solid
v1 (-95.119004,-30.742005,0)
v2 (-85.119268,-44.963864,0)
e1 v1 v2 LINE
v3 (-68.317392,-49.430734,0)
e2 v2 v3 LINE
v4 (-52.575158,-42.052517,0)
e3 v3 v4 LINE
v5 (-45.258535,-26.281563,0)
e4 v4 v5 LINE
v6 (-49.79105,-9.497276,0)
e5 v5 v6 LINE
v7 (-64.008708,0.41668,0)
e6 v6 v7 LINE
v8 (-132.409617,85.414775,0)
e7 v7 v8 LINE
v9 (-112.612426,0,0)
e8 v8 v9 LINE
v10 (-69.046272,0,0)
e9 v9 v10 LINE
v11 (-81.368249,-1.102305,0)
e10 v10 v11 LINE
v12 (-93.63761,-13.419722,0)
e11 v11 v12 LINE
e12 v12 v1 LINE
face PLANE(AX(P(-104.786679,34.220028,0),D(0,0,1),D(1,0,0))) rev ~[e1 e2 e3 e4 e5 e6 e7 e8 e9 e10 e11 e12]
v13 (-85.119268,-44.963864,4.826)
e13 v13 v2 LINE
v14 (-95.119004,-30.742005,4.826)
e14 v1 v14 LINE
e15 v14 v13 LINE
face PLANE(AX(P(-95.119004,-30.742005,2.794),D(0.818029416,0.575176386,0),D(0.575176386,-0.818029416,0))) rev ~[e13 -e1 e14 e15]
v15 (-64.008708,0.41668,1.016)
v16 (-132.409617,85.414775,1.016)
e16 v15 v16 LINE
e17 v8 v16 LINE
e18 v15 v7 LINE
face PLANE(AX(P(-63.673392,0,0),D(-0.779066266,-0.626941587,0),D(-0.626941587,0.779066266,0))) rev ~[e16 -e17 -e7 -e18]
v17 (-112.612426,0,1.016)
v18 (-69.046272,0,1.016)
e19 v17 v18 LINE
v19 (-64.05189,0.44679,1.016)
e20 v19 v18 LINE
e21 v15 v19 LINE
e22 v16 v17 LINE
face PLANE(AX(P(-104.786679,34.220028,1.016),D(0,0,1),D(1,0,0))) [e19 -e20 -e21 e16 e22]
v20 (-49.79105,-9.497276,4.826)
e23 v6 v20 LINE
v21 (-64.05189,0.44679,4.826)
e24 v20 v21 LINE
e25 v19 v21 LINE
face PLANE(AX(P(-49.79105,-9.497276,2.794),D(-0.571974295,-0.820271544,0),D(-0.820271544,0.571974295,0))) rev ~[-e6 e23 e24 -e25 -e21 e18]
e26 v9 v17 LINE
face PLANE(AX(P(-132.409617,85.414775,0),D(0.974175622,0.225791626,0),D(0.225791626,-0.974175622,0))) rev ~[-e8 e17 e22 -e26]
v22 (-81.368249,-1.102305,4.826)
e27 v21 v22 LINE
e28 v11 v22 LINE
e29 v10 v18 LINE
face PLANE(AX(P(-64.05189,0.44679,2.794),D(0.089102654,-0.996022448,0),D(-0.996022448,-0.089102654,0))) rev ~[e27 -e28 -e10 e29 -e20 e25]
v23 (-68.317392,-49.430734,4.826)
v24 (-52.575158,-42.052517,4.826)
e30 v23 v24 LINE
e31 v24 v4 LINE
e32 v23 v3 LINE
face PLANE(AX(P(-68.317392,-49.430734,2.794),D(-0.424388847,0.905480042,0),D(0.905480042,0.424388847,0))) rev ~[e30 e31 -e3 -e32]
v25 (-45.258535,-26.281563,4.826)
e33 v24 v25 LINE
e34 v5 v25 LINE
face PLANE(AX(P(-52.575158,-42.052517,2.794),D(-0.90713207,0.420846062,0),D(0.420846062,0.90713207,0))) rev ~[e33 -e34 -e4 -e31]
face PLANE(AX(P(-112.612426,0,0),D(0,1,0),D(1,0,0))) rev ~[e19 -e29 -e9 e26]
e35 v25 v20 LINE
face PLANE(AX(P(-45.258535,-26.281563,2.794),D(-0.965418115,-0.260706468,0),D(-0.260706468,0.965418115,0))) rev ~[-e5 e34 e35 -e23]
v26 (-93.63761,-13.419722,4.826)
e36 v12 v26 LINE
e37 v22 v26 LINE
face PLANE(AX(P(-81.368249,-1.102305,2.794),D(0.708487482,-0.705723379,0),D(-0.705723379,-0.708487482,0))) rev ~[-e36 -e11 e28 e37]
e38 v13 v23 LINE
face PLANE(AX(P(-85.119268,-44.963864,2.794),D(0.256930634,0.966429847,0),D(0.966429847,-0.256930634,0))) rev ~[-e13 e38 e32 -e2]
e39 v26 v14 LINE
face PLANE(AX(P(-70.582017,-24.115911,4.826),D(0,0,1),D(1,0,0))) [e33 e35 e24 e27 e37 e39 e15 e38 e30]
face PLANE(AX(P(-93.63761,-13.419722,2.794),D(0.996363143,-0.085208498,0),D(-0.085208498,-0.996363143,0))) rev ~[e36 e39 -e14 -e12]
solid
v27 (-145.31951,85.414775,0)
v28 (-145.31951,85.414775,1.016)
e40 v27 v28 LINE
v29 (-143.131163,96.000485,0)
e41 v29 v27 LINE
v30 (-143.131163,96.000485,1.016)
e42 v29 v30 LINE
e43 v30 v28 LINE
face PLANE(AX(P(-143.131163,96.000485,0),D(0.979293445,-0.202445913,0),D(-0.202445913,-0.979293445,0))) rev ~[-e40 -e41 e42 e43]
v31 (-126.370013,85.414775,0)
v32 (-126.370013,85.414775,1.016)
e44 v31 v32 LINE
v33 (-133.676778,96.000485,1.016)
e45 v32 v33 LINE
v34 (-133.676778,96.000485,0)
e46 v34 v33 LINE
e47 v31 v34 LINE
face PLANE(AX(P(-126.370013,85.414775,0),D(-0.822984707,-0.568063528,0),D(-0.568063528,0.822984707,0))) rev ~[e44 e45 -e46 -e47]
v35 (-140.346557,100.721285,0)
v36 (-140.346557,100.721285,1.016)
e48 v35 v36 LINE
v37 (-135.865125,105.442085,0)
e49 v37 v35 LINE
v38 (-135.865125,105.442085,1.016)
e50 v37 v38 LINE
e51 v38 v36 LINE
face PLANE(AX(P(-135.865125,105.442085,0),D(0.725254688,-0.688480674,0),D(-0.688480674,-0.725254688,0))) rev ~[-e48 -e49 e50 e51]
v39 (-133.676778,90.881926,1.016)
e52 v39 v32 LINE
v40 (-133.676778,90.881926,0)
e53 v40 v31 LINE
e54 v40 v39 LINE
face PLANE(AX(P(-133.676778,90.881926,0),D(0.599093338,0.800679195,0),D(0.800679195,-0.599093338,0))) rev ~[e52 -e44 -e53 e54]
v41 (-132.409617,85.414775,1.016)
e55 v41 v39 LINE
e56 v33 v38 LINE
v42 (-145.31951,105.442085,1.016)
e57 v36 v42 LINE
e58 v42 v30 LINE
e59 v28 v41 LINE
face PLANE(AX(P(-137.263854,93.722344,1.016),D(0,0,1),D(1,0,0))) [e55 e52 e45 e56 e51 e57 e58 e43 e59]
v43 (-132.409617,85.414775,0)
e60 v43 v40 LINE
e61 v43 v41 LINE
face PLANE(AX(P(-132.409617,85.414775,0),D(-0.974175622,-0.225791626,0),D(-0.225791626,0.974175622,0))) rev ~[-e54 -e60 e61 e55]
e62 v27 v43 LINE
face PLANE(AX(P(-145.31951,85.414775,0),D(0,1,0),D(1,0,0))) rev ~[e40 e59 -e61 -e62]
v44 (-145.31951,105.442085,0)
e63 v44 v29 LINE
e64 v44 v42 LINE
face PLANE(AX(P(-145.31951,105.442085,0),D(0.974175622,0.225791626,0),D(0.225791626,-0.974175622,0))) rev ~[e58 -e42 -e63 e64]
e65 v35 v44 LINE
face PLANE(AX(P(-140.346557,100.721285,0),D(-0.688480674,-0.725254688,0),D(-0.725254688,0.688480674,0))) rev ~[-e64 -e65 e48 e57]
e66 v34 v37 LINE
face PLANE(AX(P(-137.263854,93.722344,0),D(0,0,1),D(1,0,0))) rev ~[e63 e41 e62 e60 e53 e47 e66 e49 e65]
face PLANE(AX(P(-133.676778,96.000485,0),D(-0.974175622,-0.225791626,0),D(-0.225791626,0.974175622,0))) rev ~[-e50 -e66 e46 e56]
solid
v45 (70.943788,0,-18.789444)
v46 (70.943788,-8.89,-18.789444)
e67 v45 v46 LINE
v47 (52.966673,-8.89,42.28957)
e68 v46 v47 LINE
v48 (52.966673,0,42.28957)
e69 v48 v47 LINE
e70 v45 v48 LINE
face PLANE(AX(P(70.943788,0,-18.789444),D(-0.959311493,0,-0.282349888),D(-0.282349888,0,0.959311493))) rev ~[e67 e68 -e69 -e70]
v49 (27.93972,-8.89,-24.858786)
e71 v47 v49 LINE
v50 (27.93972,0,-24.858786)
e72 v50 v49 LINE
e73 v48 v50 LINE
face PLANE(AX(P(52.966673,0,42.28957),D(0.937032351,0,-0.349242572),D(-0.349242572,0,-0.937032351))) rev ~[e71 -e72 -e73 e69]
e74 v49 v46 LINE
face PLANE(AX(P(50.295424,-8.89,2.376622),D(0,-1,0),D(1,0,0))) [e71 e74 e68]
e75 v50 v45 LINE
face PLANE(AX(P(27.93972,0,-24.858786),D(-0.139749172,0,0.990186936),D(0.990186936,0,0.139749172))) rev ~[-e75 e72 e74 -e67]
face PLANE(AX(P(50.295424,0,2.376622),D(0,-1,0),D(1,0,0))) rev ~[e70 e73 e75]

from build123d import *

# Parameters (mm, degrees)
F1_DEPTH = 2.794
F3_DEPTH = 2.032
F6_DEPTH = 1.016
F8_DEPTH = 8.89


# Not quite as in the source:
# - the program builds the solid bodies; features that only make, move or delete a surface that nothing else refers to are left out


with BuildPart() as f1:
    # F0 (on Top) → F1 (new body)
    with BuildSketch(Plane.XY):
        Polygon((-52.5751584309, -42.0525174268), (-45.2585345965, -26.281562852), (-49.7910497594, -9.4972755918), (-64.0518897016, 0.4467898081), (-81.3682489225, -1.1023053687), (-93.6376104928, -13.4197222729), (-95.119003775, -30.7420046421), (-85.1192683885, -44.9638640401), (-68.3173916553, -49.4307343961), align=None)
    extrude(amount=F1_DEPTH)

    # F3 (add): a face of the model
    f3_faces = [f1.faces().sort_by_distance(p)[0] for p in [
        (-70.5820173025, -24.1159107536, 2.794),
    ]]
    extrude(f3_faces, amount=F3_DEPTH)

    # F5 (on Top) → F6 (join)
    with BuildSketch(Plane.XY):
        Polygon((-132.4096173048, 85.4147747159), (-112.612426281, 0), (-63.6733919382, 0), align=None)
    extrude(amount=F6_DEPTH)

    # F5 (on Top) → F6, piece 2 (join)
    with BuildSketch(Plane.XY):
        Polygon((-145.3195103792, 85.4147747159), (-132.4096173048, 85.4147747159), (-133.6767779322, 90.88192606), (-126.3700127602, 85.4147747159), (-133.6767779322, 96.0004851222), (-135.8651248663, 105.4420852036), (-140.3465569019, 100.7212851629), (-145.3195103792, 105.4420852036), (-143.131163445, 96.0004851222), align=None)
    extrude(amount=F6_DEPTH)


with BuildPart() as f8:
    # F7 (on Front) → F8 (new body)
    with BuildSketch(Plane.XZ):
        Polygon((52.9666729271, 42.2895699739), (27.9397200793, -24.8587857932), (70.943787694, -18.7894441187), align=None)
    extrude(amount=F8_DEPTH)


solid = Compound([f1.part, f8.part])
